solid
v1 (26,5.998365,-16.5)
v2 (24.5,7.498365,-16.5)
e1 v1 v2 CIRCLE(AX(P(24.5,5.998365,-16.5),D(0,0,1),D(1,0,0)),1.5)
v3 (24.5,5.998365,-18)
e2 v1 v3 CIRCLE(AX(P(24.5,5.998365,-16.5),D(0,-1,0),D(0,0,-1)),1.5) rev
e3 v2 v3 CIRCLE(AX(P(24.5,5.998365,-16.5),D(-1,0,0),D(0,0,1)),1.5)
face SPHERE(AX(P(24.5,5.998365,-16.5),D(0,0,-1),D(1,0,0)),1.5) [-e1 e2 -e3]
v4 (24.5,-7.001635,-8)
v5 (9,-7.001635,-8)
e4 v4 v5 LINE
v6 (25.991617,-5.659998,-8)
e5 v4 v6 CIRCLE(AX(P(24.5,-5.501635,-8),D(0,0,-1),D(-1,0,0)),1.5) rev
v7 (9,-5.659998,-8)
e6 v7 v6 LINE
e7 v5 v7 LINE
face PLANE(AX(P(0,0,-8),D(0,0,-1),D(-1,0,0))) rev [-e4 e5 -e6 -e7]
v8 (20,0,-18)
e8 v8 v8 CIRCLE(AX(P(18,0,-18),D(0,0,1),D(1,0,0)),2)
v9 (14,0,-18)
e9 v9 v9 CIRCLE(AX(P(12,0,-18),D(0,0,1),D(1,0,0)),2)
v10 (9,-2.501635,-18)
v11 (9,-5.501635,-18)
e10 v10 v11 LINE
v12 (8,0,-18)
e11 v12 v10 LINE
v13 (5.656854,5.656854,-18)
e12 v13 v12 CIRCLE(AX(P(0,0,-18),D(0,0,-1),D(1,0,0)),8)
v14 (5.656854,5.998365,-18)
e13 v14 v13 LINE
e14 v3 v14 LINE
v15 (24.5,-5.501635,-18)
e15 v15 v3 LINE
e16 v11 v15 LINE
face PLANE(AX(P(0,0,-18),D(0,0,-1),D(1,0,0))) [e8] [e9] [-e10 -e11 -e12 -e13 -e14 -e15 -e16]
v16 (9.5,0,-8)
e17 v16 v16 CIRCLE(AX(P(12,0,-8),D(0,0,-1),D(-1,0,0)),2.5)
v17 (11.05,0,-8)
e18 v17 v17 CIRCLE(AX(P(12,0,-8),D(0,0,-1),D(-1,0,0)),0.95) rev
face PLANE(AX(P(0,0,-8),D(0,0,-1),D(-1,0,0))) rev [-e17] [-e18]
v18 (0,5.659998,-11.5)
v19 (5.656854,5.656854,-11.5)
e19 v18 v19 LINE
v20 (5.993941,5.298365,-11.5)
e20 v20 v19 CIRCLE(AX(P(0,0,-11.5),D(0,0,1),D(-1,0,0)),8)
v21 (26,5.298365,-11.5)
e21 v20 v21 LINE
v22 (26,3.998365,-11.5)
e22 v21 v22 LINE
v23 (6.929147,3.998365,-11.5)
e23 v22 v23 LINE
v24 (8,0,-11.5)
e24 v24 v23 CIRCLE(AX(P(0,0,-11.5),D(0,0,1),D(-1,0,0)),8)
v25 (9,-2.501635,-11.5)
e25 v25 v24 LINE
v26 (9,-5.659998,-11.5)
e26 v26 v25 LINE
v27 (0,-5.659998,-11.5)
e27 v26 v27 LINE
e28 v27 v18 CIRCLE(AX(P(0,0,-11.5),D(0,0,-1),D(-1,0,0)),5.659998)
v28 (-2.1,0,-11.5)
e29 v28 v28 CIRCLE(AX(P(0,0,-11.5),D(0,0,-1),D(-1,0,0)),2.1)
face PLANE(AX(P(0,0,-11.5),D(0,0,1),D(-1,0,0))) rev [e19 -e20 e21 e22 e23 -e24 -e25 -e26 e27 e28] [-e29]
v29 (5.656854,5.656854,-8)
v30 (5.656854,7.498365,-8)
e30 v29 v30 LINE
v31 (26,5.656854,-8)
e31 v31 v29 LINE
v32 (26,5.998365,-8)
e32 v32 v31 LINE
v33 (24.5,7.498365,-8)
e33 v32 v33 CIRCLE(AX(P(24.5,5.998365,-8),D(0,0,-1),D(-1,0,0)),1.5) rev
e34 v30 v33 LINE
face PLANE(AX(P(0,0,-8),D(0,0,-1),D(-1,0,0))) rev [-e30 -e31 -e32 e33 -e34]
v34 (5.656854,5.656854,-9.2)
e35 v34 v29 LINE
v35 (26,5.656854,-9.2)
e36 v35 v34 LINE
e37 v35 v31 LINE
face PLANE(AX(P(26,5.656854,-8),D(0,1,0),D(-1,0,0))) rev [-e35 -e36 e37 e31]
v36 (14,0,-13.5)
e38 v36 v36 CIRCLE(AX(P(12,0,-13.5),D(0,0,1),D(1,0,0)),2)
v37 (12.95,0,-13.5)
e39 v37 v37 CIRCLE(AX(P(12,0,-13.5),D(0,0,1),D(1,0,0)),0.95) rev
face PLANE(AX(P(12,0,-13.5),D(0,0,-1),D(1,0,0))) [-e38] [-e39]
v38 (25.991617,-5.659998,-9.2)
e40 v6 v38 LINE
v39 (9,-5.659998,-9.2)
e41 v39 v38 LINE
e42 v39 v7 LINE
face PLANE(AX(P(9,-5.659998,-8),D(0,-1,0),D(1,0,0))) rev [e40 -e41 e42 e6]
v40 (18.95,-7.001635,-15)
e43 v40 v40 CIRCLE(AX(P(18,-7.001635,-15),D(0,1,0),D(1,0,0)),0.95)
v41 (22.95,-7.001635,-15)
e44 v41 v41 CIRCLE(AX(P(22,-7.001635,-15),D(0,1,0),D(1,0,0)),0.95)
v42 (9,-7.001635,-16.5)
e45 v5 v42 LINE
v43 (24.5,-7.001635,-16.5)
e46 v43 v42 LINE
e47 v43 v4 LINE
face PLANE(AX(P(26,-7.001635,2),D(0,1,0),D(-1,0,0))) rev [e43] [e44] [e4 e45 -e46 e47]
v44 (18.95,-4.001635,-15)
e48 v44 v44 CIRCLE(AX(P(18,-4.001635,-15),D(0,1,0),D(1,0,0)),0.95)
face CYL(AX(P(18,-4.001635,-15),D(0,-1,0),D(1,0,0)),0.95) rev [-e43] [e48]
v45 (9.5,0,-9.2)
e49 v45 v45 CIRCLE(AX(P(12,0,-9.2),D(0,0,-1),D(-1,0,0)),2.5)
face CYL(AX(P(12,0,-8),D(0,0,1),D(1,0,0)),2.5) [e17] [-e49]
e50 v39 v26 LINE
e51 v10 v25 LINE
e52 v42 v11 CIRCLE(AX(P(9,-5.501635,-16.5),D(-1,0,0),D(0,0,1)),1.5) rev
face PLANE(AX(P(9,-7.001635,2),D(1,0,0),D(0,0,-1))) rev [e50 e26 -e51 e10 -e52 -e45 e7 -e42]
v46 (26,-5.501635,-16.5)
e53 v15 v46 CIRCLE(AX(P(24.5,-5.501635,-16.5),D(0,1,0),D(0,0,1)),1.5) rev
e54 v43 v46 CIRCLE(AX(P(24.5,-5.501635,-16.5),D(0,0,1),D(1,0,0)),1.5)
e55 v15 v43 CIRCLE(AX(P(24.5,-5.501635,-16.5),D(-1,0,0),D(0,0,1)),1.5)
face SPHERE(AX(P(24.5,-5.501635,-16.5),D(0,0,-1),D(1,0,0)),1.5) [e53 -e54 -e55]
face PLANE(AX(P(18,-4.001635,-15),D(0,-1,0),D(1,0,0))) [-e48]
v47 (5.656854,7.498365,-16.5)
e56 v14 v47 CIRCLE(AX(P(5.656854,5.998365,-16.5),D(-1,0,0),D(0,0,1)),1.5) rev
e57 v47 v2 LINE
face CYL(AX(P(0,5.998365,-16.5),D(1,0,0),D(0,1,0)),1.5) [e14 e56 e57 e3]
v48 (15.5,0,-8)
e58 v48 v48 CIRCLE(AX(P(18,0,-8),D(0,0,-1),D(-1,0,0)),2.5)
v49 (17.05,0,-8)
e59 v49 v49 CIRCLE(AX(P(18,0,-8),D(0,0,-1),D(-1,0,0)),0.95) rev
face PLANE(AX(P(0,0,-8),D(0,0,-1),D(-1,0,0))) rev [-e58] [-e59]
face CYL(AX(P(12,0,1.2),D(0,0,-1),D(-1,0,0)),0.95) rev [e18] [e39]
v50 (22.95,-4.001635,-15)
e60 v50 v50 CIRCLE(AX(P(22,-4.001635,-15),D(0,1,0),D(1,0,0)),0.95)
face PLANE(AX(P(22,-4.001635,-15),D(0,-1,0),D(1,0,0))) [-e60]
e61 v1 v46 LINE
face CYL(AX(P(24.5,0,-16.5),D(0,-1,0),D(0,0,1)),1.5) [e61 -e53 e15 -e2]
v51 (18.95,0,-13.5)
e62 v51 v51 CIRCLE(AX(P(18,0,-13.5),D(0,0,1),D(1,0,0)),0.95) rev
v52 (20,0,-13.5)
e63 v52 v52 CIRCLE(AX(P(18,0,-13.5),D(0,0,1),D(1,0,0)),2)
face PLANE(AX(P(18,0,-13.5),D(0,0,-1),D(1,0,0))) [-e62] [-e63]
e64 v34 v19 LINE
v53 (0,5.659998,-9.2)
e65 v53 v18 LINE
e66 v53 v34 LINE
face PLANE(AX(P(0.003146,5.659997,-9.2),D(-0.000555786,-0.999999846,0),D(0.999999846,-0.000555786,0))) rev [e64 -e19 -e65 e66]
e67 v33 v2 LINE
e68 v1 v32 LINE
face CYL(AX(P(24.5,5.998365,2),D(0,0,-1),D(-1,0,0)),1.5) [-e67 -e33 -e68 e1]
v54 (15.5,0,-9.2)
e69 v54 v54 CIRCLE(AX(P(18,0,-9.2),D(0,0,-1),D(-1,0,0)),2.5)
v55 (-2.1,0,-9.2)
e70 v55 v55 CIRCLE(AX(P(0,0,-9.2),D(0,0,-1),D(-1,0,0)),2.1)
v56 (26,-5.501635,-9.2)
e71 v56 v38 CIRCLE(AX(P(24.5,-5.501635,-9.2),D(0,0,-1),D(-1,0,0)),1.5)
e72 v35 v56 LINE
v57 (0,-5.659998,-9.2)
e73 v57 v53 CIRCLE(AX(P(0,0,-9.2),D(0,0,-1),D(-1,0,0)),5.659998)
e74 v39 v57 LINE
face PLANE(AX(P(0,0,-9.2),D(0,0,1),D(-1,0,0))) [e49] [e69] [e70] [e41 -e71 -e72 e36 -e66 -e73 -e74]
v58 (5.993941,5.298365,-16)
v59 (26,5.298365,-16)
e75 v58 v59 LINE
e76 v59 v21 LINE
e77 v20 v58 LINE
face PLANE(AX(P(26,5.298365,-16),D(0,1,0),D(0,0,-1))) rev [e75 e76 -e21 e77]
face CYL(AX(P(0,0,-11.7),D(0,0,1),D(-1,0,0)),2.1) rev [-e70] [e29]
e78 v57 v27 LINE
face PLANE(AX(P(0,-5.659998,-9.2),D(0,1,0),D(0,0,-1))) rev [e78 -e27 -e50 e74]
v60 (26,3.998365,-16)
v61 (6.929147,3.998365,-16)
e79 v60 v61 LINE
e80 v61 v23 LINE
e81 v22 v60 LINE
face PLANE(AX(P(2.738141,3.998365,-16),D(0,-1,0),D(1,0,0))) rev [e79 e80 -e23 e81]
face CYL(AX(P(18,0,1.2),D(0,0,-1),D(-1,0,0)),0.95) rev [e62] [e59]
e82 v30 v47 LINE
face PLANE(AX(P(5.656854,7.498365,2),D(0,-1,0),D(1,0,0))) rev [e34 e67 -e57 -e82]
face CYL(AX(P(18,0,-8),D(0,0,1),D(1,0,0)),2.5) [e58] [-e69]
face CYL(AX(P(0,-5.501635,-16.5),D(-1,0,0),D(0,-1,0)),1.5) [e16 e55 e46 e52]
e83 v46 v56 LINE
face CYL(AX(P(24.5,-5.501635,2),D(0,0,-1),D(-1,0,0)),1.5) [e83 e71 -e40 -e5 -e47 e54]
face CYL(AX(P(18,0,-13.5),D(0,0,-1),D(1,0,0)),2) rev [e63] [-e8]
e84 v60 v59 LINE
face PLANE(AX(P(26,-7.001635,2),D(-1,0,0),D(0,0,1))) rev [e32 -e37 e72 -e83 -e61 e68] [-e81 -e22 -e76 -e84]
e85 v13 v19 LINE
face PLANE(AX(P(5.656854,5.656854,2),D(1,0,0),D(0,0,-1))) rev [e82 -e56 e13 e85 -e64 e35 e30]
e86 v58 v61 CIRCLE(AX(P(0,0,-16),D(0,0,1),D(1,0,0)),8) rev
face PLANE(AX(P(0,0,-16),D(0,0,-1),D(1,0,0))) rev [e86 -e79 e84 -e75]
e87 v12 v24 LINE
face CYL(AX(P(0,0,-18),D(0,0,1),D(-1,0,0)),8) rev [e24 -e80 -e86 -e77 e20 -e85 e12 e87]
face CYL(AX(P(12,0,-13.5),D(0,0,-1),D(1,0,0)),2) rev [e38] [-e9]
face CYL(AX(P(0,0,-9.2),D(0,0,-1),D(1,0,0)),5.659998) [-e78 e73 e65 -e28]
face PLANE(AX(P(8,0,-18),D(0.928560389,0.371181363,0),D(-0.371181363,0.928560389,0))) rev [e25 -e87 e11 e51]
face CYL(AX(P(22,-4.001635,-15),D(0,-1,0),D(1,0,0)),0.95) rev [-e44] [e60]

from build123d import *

# Parameters (mm, degrees)
BOSS_EXTRUDE1_DEPTH = 2
BOSS_EXTRUDE2_START = 4.5
BOSS_EXTRUDE2_DEPTH = 4.5
CUT_EXTRUDE1_DEPTH  = 4.5
BOSS_EXTRUDE3_DEPTH = 2.3
SKETCH9_R           = 2.1
CUT_EXTRUDE2_DEPTH  = 2.5
SKETCH10_R          = 2.5
BOSS_EXTRUDE4_DEPTH = 1.2
SKETCH11_R          = 0.95
CUT_EXTRUDE3_DEPTH  = 9.2
SKETCH12_R          = 2
CUT_EXTRUDE4_DEPTH  = 4.5
SKETCH14_W          = 20.343145751
SKETCH14_H          = 1.841510486
SKETCH14_W_2        = 17
SKETCH14_H_2        = 1.341637015
BOSS_EXTRUDE5_DEPTH = 1.2
FILLET1_R           = 1.5
SKETCH17_R          = 0.95
CUT_EXTRUDE5_DEPTH  = 3


# Read off the part's stored shape, not the designer's step: Boss-Extrude3
with BuildPart() as part:
    # Sketch5 → Boss-Extrude1 (new body)
    with BuildSketch(Plane.XY):
        with BuildLine():
            Line((8, 0), (9, -2.501635265))
            Line((9, -2.501635265), (9, -7.001635265))
            Line((9, -7.001635265), (26, -7.001635265))
            Line((26, -7.001635265), (26, 7.498364735))
            Line((26, 7.498364735), (5.656854249, 7.498364735))
            Line((5.656854249, 7.498364735), (5.656854249, 5.656854249))
            ThreePointArc((5.656854249, 5.656854249), (7.39103626, 3.061467459), (8, 0))
        make_face()
    extrude(amount=BOSS_EXTRUDE1_DEPTH)

    # Sketch6 → Boss-Extrude2 (add)
    with BuildSketch(Plane(origin=(0, 0, 0), x_dir=(-1, 0, 0), z_dir=(0, 0, -1)).offset(BOSS_EXTRUDE2_START)):
        with BuildLine():
            Line((-5.656854249, 7.498364735), (-5.656854249, 5.656854249))
            ThreePointArc((-5.656854249, 5.656854249), (-7.39103626, 3.061467459), (-8, 0))
            Line((-8, 0), (-9, -2.501635265))
            Line((-9, -2.501635265), (-9, -7.001635265))
            Line((-9, -7.001635265), (-26, -7.001635265))
            Line((-26, -7.001635265), (-26, 7.498364735))
            Line((-26, 7.498364735), (-5.656854249, 7.498364735))
        make_face()
    extrude(amount=-BOSS_EXTRUDE2_DEPTH)

    # Sketch7 → Cut-Extrude1 (cut)
    with BuildSketch(Plane(origin=(0, 0, -4.5), x_dir=(-1, 0, 0), z_dir=(0, 0, -1))):
        Polygon((-26, 5.298364735), (-2.738141148, 5.298364735), (-2.738141148, 3.998364735), (-29.849535112, 3.998364735), (-29.849535112, 5.298364735), align=None)
    extrude(amount=-CUT_EXTRUDE1_DEPTH, mode=Mode.SUBTRACT)

    # Boss-Extrude3 outline → Boss-Extrude3 (add)
    with BuildSketch(Plane(origin=(0, 0, -4.5), x_dir=(-1, 0, 0), z_dir=(0, 0, -1))):
        with BuildLine():
            Line((-9, -7.001635265), (-9, -5.65999825))
            Line((-9, -5.65999825), (0, -5.659997813))
            ThreePointArc((0, -5.659997813), (5.659997813, 0), (0, 5.659997813))
            Line((0, 5.659997813), (-5.656854249, 5.656854249))
            Line((-5.656854249, 5.656854249), (-5.656854249, 7.498364735))
            Line((-5.656854249, 7.498364735), (-26, 7.498364735))
            Line((-26, 7.498364735), (-26, -7.001635265))
            Line((-26, -7.001635265), (-9, -7.001635265))
        make_face()
    extrude(amount=BOSS_EXTRUDE3_DEPTH)

    # Sketch9 → Cut-Extrude2 (cut)
    with BuildSketch(Plane(origin=(0, 0, -6.8), x_dir=(-1, 0, 0), z_dir=(0, 0, -1))):
        Circle(SKETCH9_R)
    extrude(amount=-CUT_EXTRUDE2_DEPTH, mode=Mode.SUBTRACT)

    # Sketch10 → Boss-Extrude4 (add)
    with BuildSketch(Plane(origin=(0, 0, -6.8), x_dir=(-1, 0, 0), z_dir=(0, 0, -1))):
        with Locations((-12, 0)):
            Circle(SKETCH10_R)
        with Locations((-18, 0)):
            Circle(SKETCH10_R)
    extrude(amount=BOSS_EXTRUDE4_DEPTH)

    # Sketch11 → Cut-Extrude3 (cut)
    with BuildSketch(Plane(origin=(0, 0, -8), x_dir=(-1, 0, 0), z_dir=(0, 0, -1))):
        with Locations((-18, 0)):
            Circle(SKETCH11_R)
        with Locations((-12, 0)):
            Circle(SKETCH11_R)
    extrude(amount=-CUT_EXTRUDE3_DEPTH, mode=Mode.SUBTRACT)

    # Sketch12 → Cut-Extrude4 (cut)
    with BuildSketch(Plane.XY.offset(2)):
        with Locations((12, 0)):
            Circle(SKETCH12_R)
        with Locations((18, 0)):
            Circle(SKETCH12_R)
    extrude(amount=-CUT_EXTRUDE4_DEPTH, mode=Mode.SUBTRACT)

    # Sketch14 → Boss-Extrude5 (add)
    with BuildSketch(Plane(origin=(0, 0, -6.8), x_dir=(-1, 0, 0), z_dir=(0, 0, -1))):
        with Locations((-15.828427124, 6.577609492)):
            Rectangle(SKETCH14_W, SKETCH14_H)
        with Locations((-17.5, -6.330816758)):
            Rectangle(SKETCH14_W_2, SKETCH14_H_2)
    extrude(amount=BOSS_EXTRUDE5_DEPTH)

    # Fillet1
    # the kernel refuses this fillet: 1.5 mm, written as the material it takes off along each edge
    with BuildSketch(Plane(origin=(24.5, -5.501635265, 0.5), x_dir=(0, 0, 1), z_dir=(0, -1, 0))) as fillet1_piece_1_section:
        Polygon((0, 0), (FILLET1_R, 0), (FILLET1_R, -FILLET1_R), (0, -FILLET1_R), align=None)
    fillet1_piece_1 = extrude(amount=FILLET1_R, mode=Mode.PRIVATE)
    fillet1_piece_1 = fillet1_piece_1 - Plane(origin=(24.5, -5.501635265, 0.5), x_dir=(-0.7071067811865475, 0, -0.7071067811865475), z_dir=(0, -1, 0)) * Sphere(FILLET1_R, mode=Mode.PRIVATE)
    add(fillet1_piece_1, mode=Mode.SUBTRACT)
    with BuildSketch(Plane(origin=(24.5, 5.998364735, 0.5), x_dir=(0, 0, 1), z_dir=(0, 1, 0))) as fillet1_piece_2_section:
        Polygon((0, 0), (FILLET1_R, 0), (FILLET1_R, FILLET1_R), (0, FILLET1_R), align=None)
    fillet1_piece_2 = extrude(amount=FILLET1_R, mode=Mode.PRIVATE)
    fillet1_piece_2 = fillet1_piece_2 - Plane(origin=(24.5, 5.998364735, 0.5), x_dir=(-0.7071067811865475, 0, -0.7071067811865475), z_dir=(0, 1, 0)) * Sphere(FILLET1_R, mode=Mode.PRIVATE)
    add(fillet1_piece_2, mode=Mode.SUBTRACT)
    with BuildSketch(Plane(origin=(26, -5.501635265, 2), x_dir=(-1, 0, 0), z_dir=(0, 1, 0))) as fillet1_piece_3:
        with BuildLine():
            CenterArc((FILLET1_R, -FILLET1_R), FILLET1_R, 90, 90)
            Line((0, -FILLET1_R), (0, 0))
            Line((0, 0), (FILLET1_R, 0))
        make_face()
    extrude(amount=11.5, mode=Mode.SUBTRACT)
    with BuildSketch(Plane(origin=(26, -7.001635265, -4.5), x_dir=(-1, 0, 0), z_dir=(0, 0, 1))) as fillet1_piece_4:
        with BuildLine():
            CenterArc((FILLET1_R, -FILLET1_R), FILLET1_R, 90, 90)
            Line((0, -FILLET1_R), (0, 0))
            Line((0, 0), (FILLET1_R, 0))
        make_face()
    extrude(amount=5, mode=Mode.SUBTRACT)
    with BuildSketch(Plane(origin=(5.25, -7.001635265, 2), x_dir=(0, 1, 0), z_dir=(1, 0, 0))) as fillet1_piece_5:
        with BuildLine():
            CenterArc((FILLET1_R, -FILLET1_R), FILLET1_R, 90, 90)
            Line((0, -FILLET1_R), (0, 0))
            Line((0, 0), (FILLET1_R, 0))
        make_face()
    extrude(amount=19.25, mode=Mode.SUBTRACT)
    with BuildSketch(Plane(origin=(24.5, 7.498364735, 2), x_dir=(0, -1, 0), z_dir=(-1, 0, 0))) as fillet1_piece_6:
        with BuildLine():
            CenterArc((FILLET1_R, -FILLET1_R), FILLET1_R, 90, 90)
            Line((0, -FILLET1_R), (0, 0))
            Line((0, 0), (FILLET1_R, 0))
        make_face()
    extrude(amount=22.593145751, mode=Mode.SUBTRACT)
    with BuildSketch(Plane(origin=(26, 7.498364735, -4.5), x_dir=(-1, 0, 0), z_dir=(0, 0, 1))) as fillet1_piece_7:
        with BuildLine():
            CenterArc((FILLET1_R, FILLET1_R), FILLET1_R, 180, 90)
            Line((0, FILLET1_R), (0, 0))
            Line((0, 0), (FILLET1_R, 0))
        make_face()
    extrude(amount=5, mode=Mode.SUBTRACT)
    with BuildSketch(Plane(origin=(26, 7.498364735, -4.5), x_dir=(-1.0, -1.9174232572065026e-10, 0), z_dir=(0, 0, -1))) as fillet1_piece_8:
        with BuildLine():
            CenterArc((FILLET1_R, -FILLET1_R), FILLET1_R, 90.000000011, 90)
            Line((FILLET1_R * 1.9173522033e-10, -FILLET1_R), (0, 0))
            Line((0, 0), (FILLET1_R, 0))
        make_face()
    extrude(amount=2.3, mode=Mode.SUBTRACT)
    with BuildSketch(Plane(origin=(26, 7.498364735, -6.8), x_dir=(-1, 0, 0), z_dir=(0, 0, -1))) as fillet1_piece_9:
        with BuildLine():
            CenterArc((FILLET1_R, -FILLET1_R), FILLET1_R, 90, 90)
            Line((0, -FILLET1_R), (0, 0))
            Line((0, 0), (FILLET1_R, 0))
        make_face()
    extrude(amount=4.95, mode=Mode.SUBTRACT)
    with BuildSketch(Plane(origin=(26, -7.001635265, -4.5), x_dir=(-1.0, -1.9169850891861218e-10, 0), z_dir=(0, 0, -1))) as fillet1_piece_10:
        with BuildLine():
            CenterArc((FILLET1_R, FILLET1_R), FILLET1_R, 180.000000011, 90)
            Line((-FILLET1_R * 1.91707982785e-10, FILLET1_R), (0, 0))
            Line((0, 0), (FILLET1_R, 0))
        make_face()
    extrude(amount=2.3, mode=Mode.SUBTRACT)
    with BuildSketch(Plane(origin=(26, -7.001635265, -6.8), x_dir=(-1, 0, 0), z_dir=(0, 0, -1))) as fillet1_piece_11:
        with BuildLine():
            CenterArc((FILLET1_R, FILLET1_R), FILLET1_R, 180, 90)
            Line((0, FILLET1_R), (0, 0))
            Line((0, 0), (FILLET1_R, 0))
        make_face()
    extrude(amount=4.95, mode=Mode.SUBTRACT)

    # Sketch17 → Cut-Extrude5 (cut)
    with BuildSketch(Plane.XZ.offset(7.001635265)):
        with Locations((22, -1)):
            Circle(SKETCH17_R)
        with Locations((18, -1)):
            Circle(SKETCH17_R)
    extrude(amount=-CUT_EXTRUDE5_DEPTH, mode=Mode.SUBTRACT)

    # Mirror1: part across plane


with BuildPart() as part_1:
    add(part.part)
    add(part.part.mirror(Plane(origin=(0, 0, -8), x_dir=(1, 0, 0), z_dir=(0, 0, -1))))


with BuildPart() as body_2:
    # Split1: the piece on the far side of the plane
    add(part_1.part)
    split(bisect_by=Plane(origin=(0, 0, -8), x_dir=(-1, 0, 0), z_dir=(0, 0, -1)), keep=Keep.BOTTOM)


with BuildPart() as part_2:
    add(part_1.part)

    # Split1
    split(bisect_by=Plane(origin=(0, 0, -8), x_dir=(-1, 0, 0), z_dir=(0, 0, -1)), keep=Keep.TOP)


solid = part_2.part
